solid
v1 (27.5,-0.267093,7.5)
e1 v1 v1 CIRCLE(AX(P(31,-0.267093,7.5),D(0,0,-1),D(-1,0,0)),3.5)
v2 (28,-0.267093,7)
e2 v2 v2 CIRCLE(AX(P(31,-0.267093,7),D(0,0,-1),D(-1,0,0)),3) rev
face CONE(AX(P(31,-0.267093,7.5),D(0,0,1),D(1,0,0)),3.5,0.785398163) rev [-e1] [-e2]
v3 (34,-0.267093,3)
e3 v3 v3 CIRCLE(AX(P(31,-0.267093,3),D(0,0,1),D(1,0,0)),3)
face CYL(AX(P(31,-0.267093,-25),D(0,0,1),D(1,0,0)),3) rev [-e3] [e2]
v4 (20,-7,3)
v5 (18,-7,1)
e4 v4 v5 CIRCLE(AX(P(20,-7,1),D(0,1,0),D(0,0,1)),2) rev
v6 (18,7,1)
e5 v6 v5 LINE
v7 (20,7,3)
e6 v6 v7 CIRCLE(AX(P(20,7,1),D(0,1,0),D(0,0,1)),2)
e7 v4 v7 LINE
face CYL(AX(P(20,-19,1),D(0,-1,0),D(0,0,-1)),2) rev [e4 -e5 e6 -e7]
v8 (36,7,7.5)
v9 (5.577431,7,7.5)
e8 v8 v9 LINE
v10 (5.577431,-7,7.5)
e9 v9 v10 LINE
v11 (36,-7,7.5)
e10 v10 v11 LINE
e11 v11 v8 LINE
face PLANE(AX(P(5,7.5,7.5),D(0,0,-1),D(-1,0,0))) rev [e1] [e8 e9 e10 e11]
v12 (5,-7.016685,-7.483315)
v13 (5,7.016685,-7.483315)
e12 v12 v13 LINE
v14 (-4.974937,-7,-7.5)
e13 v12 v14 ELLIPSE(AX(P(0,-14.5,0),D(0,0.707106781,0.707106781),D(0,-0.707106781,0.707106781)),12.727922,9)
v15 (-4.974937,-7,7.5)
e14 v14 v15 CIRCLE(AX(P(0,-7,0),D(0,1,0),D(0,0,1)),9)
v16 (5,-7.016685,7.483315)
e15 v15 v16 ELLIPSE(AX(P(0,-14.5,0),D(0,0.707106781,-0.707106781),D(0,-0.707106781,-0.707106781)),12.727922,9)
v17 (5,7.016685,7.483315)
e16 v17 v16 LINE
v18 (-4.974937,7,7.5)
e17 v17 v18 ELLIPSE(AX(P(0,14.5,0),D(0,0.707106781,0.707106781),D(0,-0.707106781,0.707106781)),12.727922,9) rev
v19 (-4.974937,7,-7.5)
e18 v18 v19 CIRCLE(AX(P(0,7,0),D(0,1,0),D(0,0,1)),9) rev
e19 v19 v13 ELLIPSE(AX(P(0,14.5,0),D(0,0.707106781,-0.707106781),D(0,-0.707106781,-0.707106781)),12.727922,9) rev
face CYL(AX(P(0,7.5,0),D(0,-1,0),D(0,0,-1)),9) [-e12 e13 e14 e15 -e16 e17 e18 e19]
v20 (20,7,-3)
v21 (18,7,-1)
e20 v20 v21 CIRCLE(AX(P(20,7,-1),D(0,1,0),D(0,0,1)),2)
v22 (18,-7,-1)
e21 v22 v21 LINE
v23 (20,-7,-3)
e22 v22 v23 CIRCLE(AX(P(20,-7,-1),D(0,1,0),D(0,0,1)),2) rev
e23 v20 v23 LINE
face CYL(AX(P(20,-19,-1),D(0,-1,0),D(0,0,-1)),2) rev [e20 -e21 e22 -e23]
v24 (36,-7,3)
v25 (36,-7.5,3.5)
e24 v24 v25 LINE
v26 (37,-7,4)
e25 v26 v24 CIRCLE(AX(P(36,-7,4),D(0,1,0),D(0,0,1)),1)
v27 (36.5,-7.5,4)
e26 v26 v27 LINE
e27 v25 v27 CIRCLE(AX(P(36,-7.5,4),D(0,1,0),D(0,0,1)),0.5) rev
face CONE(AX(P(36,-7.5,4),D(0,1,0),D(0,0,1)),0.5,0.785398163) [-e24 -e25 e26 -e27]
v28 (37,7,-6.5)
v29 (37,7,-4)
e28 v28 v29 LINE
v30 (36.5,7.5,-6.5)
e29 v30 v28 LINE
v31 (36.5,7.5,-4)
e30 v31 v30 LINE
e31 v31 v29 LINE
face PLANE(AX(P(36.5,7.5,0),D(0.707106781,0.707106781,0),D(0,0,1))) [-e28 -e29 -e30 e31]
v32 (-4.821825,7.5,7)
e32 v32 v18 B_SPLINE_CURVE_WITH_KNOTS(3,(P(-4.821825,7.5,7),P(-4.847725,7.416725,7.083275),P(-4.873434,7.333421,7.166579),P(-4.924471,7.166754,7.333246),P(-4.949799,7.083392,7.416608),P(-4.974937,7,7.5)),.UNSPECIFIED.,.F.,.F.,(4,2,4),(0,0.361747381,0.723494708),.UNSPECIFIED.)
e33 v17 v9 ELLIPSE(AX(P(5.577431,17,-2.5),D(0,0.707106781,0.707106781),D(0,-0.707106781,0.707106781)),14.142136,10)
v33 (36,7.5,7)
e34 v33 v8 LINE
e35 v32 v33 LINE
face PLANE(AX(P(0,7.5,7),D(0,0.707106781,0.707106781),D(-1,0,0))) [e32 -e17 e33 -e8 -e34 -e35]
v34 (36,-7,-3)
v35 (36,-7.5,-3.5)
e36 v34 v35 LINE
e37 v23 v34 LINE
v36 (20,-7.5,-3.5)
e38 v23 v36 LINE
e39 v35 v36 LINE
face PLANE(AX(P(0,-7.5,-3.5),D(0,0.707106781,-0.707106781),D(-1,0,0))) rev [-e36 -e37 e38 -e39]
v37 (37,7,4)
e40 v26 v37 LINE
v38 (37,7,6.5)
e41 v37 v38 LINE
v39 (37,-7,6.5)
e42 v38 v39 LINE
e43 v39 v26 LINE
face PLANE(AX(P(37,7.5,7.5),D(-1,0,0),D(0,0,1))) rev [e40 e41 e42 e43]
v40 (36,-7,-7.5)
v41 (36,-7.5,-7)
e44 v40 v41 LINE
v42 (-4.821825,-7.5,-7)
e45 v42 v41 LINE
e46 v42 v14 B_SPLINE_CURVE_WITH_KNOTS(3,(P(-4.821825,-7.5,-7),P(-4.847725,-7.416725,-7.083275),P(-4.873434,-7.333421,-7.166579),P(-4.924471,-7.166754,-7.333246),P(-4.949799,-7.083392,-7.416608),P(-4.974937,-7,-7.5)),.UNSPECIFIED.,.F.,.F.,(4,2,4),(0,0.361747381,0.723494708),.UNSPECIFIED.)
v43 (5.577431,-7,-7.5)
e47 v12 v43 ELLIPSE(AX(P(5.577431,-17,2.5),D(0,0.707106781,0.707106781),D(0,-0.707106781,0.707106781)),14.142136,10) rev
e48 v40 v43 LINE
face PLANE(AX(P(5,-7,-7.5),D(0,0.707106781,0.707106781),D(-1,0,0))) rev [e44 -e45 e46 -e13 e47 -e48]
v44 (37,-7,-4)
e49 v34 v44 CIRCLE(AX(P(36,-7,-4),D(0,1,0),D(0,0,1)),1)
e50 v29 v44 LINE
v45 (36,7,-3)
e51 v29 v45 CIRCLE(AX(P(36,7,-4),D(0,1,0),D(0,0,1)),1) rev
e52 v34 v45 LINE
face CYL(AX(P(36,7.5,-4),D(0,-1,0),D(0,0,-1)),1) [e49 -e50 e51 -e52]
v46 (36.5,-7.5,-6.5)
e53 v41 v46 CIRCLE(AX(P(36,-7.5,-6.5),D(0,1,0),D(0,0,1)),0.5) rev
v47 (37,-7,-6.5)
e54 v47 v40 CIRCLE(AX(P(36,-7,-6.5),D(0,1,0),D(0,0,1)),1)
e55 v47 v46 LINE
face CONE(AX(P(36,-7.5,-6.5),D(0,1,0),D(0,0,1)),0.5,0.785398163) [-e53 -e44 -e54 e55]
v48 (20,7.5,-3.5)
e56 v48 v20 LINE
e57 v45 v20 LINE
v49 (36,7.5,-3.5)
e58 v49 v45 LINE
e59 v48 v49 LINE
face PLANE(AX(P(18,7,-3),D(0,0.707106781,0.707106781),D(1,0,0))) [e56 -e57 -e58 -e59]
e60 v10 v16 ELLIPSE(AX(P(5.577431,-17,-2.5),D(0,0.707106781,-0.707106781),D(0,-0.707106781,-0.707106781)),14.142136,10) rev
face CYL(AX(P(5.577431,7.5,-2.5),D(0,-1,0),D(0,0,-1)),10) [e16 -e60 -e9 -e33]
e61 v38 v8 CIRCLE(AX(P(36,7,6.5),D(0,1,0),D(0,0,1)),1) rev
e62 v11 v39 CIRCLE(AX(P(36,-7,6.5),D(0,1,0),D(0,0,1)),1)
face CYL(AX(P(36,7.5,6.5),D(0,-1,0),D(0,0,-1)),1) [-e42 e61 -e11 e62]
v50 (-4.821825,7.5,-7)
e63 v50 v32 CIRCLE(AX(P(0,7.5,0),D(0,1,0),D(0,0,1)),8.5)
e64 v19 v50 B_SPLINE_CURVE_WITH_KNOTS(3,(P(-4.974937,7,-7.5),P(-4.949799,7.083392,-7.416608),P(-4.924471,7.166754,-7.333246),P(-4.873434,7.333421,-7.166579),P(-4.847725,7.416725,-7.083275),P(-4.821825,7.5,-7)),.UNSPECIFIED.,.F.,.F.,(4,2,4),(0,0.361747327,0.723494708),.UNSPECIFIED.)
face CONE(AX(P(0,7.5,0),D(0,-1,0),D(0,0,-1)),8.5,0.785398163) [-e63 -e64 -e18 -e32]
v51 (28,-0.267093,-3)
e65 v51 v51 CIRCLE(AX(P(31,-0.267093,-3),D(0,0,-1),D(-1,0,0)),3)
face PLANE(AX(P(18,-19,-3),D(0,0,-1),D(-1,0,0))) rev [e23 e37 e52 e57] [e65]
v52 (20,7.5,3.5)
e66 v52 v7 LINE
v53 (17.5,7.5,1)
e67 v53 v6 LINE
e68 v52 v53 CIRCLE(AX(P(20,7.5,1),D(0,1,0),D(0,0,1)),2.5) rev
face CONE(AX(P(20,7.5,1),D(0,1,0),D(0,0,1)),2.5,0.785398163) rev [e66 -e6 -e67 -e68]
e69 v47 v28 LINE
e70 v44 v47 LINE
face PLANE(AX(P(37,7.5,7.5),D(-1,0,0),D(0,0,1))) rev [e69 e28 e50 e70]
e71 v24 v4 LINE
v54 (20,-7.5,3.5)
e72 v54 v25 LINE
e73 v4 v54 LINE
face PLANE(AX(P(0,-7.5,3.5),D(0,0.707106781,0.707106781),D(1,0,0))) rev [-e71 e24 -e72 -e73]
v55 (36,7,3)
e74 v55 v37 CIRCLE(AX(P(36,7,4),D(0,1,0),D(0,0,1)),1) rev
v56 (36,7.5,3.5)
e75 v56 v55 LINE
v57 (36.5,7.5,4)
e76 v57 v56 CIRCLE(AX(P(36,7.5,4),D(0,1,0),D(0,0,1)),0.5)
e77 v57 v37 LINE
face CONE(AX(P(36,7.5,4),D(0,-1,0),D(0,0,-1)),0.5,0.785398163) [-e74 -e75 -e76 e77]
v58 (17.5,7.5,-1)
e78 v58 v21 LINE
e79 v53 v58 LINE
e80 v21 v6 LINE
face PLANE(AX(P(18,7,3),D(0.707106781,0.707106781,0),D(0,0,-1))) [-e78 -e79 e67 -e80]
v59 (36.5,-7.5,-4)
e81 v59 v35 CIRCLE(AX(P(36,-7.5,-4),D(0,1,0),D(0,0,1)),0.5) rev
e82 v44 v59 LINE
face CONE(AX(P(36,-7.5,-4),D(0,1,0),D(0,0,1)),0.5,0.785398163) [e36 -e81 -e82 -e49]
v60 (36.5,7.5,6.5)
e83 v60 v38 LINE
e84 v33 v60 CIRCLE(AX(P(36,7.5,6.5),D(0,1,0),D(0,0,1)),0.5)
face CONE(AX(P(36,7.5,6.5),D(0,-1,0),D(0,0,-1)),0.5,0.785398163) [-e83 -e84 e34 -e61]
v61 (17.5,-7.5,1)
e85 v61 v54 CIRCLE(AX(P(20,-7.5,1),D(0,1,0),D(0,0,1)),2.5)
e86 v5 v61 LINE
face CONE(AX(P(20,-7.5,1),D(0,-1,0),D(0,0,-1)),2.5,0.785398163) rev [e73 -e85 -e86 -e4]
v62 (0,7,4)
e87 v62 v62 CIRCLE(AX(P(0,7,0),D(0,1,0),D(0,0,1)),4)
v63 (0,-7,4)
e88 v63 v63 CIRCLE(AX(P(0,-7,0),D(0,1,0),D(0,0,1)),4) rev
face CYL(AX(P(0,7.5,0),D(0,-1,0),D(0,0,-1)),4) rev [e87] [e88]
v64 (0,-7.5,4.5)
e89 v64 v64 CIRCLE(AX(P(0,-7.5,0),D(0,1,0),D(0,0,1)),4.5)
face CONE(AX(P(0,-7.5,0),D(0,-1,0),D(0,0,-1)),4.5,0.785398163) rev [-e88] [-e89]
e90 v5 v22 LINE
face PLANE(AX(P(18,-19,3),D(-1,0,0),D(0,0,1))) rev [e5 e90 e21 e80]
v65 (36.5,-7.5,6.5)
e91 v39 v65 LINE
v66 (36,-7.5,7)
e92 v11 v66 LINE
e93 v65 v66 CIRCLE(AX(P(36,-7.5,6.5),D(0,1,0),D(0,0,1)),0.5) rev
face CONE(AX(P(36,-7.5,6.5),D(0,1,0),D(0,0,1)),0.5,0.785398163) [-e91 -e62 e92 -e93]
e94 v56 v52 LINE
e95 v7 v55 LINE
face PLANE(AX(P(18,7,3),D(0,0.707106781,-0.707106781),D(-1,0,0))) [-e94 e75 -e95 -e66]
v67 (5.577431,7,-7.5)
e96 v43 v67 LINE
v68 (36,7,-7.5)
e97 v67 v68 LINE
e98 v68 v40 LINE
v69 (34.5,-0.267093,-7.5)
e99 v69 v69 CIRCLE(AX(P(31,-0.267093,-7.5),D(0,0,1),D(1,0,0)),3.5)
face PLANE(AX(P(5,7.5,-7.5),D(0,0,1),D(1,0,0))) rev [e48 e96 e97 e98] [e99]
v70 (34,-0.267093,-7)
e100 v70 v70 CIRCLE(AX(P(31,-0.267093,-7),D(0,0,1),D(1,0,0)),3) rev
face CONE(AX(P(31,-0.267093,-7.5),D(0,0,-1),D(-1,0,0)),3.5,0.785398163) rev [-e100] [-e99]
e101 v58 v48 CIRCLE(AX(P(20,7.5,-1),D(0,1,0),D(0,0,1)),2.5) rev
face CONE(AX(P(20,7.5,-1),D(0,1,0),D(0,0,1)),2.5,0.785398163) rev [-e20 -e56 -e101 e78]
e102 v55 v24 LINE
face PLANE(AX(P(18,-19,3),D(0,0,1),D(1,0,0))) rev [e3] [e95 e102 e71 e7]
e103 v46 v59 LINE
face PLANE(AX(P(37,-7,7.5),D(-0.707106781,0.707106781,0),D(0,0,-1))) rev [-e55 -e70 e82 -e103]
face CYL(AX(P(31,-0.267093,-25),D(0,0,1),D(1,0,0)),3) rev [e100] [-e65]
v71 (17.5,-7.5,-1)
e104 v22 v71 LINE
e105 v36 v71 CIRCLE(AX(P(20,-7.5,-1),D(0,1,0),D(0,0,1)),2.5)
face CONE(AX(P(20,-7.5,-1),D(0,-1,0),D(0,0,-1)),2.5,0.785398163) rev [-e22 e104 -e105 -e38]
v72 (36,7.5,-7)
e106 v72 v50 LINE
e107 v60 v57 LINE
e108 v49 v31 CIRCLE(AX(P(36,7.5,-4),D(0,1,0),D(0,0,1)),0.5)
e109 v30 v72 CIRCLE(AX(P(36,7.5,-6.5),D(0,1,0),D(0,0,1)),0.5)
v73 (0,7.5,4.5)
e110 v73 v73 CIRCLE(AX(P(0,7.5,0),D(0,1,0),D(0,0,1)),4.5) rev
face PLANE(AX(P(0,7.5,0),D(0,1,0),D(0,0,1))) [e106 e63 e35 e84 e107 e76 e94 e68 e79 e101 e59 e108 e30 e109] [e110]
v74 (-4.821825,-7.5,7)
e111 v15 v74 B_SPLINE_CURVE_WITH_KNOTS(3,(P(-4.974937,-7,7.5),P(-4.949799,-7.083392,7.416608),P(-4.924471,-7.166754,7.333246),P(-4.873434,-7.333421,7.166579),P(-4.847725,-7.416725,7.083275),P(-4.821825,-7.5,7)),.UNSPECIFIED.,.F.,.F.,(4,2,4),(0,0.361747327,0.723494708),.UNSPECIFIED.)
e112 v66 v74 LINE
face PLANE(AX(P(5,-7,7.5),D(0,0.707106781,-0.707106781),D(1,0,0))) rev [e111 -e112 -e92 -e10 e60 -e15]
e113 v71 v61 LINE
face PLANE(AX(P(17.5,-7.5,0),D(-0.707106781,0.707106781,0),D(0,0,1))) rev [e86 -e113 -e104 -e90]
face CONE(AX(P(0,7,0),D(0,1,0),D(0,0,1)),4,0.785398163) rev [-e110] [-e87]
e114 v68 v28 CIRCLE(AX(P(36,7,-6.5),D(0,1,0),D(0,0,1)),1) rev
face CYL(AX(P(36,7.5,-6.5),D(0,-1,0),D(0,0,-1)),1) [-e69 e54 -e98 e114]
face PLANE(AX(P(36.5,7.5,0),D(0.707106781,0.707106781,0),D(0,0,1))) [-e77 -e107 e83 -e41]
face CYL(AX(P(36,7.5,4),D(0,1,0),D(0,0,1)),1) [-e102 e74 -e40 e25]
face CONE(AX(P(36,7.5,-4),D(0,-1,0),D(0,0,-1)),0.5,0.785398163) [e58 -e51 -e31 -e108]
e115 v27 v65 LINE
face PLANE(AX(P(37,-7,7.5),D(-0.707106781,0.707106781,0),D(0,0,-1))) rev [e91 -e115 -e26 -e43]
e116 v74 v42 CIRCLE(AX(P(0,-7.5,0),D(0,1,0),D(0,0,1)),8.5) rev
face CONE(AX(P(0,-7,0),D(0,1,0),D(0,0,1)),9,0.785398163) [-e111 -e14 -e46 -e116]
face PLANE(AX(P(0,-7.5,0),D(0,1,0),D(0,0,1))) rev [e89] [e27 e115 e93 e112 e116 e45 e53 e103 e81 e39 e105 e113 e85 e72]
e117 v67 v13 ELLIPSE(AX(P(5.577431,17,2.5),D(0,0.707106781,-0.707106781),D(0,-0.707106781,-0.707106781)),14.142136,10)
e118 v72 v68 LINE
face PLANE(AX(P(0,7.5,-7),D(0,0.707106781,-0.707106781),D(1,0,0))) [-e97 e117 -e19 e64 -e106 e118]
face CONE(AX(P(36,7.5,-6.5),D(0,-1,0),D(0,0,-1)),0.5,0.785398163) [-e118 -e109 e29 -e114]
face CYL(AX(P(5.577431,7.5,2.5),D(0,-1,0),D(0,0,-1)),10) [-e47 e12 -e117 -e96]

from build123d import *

# Parameters (mm, degrees)
SKETCH1_R           = 9
SKETCH1_R_2         = 4
BOSS_EXTRUDE1_DEPTH = 7.5
SKETCH2_W           = 32
SKETCH2_H           = 15
BOSS_EXTRUDE2_DEPTH = 7.5
SKETCH3_W           = 38
SKETCH3_H           = 6
CUT_EXTRUDE1_DEPTH  = 19
SKETCH4_R           = 3
CUT_EXTRUDE2_DEPTH  = 22
FILLET1_R           = 2
FILLET2_R           = 1
CHAMFER1_SIZE       = 0.5
CHAMFER2_SIZE       = 0.5
CHAMFER3_SIZE       = 0.5
FILLET3_R           = 10


with BuildPart() as part:
    # Sketch1 → Boss-Extrude1 (new, symmetric)
    with BuildSketch(Plane(origin=(0, 0, 0), x_dir=(1, 0, 0), z_dir=(0, 1, 0))):
        with Locations(Location((0, 0, 0), (0, 0, 270))):
            Circle(SKETCH1_R)
        with Locations(Location((0, 0, 0), (0, 0, 270))):
            Circle(SKETCH1_R_2, mode=Mode.SUBTRACT)
    extrude(amount=BOSS_EXTRUDE1_DEPTH, both=True)

    # Sketch2 → Boss-Extrude2 (add, symmetric)
    with BuildSketch(Plane(origin=(0, 0, 0), x_dir=(1, 0, 0), z_dir=(0, 1, 0))):
        with Locations((21, 0)):
            Rectangle(SKETCH2_W, SKETCH2_H)
    extrude(amount=BOSS_EXTRUDE2_DEPTH, both=True)

    # Sketch3 → Cut-Extrude1 (cut, symmetric)
    with BuildSketch(Plane(origin=(0, 0, 0), x_dir=(1, 0, 0), z_dir=(0, 1, 0))):
        with Locations((37, 0)):
            Rectangle(SKETCH3_W, SKETCH3_H)
    extrude(amount=CUT_EXTRUDE1_DEPTH, both=True, mode=Mode.SUBTRACT)

    # Sketch4 → Cut-Extrude2 (cut, symmetric)
    with BuildSketch(Plane.XY.offset(-3)):
        with Locations((31, -0.267092661)):
            Circle(SKETCH4_R)
    extrude(amount=CUT_EXTRUDE2_DEPTH, both=True, mode=Mode.SUBTRACT)

    # Fillet1
    fillet1_edges = [part.edges().sort_by_distance(p)[0] for p in [
        (18, 0, 3),
        (18, 0, -3),
    ]]
    fillet(fillet1_edges, radius=FILLET1_R)

    # Fillet2
    fillet2_edges = [part.edges().sort_by_distance(p)[0] for p in [
        (37, 0, 7.5),
        (37, 0, -7.5),
        (37, 0, -3),
        (37, 0, 3),
    ]]
    fillet(fillet2_edges, radius=FILLET2_R)

    # Chamfer1
    chamfer1_edges = [part.edges().sort_by_distance(p)[0] for p in [
        (28, -0.267092661, 7.5),
        (28, -0.267092661, -7.5),
        (0, -7.5, -4),
        (0, 7.5, -4),
    ]]
    chamfer(chamfer1_edges, length=CHAMFER1_SIZE)

    # Chamfer2
    chamfer2_edges = [part.edges().sort_by_distance(p)[0] for p in [
        (20.5, 7.5, -7.5),
        (20.5, -7.5, -7.5),
        (36.707106781, -7.5, -7.207106781),
        (37, -7.5, -5.25),
        (37, 7.5, -5.25),
        (36.707106781, -7.5, -3.292893219),
        (28, -7.5, -3),
        (18.585786438, -7.5, -2.414213562),
        (18, -7.5, 0),
        (18.585786438, -7.5, 2.414213562),
        (28, -7.5, 3),
        (36.707106781, -7.5, 3.292893219),
        (37, -7.5, 5.25),
        (37, 7.5, 5.25),
        (36.707106781, -7.5, 7.207106781),
        (20.5, -7.5, 7.5),
        (20.5, 7.5, 7.5),
        (36.707106781, 7.5, -7.207106781),
        (36.707106781, 7.5, -3.292893219),
        (28, 7.5, -3),
        (18.585786438, 7.5, -2.414213562),
        (18, 7.5, 0),
        (18.585786438, 7.5, 2.414213562),
        (28, 7.5, 3),
        (36.707106781, 7.5, 3.292893219),
        (36.707106781, 7.5, 7.207106781),
    ]]
    chamfer(chamfer2_edges, length=CHAMFER2_SIZE)

    # Chamfer3
    chamfer3_edges = [part.edges().sort_by_distance(p)[0] for p in [
        (-9, 7.5, 0),
        (-9, -7.5, 0),
    ]]
    chamfer(chamfer3_edges, length=CHAMFER3_SIZE)

    # Fillet3
    # the kernel refuses this fillet: 10 mm, written as the material it takes off along each edge
    with BuildSketch(Plane(origin=(5, 8.443576575, -7.5), x_dir=(0, 0, 1), z_dir=(0, -1, 0))) as fillet3_piece_1:
        with BuildLine():
            CenterArc((10, -0.57743063), FILLET3_R, 176.6897249, 3.3102751)
            Line((0, -0.57743063), (0, 0))
            Line((0, 0), (0.016685226, 0))
        make_face()
    extrude(amount=16.887153149, mode=Mode.SUBTRACT)
    with BuildSketch(Plane(origin=(5, 8.443576575, 7.5), x_dir=(0, 0, -1), z_dir=(0, -1, 0))) as fillet3_piece_2:
        with BuildLine():
            CenterArc((10, 0.57743063), FILLET3_R, 180, 3.3102751)
            Line((0, 0.57743063), (0, 0))
            Line((0, 0), (0.016685226, 0))
        make_face()
    extrude(amount=16.887153149, mode=Mode.SUBTRACT)


solid = part.part
